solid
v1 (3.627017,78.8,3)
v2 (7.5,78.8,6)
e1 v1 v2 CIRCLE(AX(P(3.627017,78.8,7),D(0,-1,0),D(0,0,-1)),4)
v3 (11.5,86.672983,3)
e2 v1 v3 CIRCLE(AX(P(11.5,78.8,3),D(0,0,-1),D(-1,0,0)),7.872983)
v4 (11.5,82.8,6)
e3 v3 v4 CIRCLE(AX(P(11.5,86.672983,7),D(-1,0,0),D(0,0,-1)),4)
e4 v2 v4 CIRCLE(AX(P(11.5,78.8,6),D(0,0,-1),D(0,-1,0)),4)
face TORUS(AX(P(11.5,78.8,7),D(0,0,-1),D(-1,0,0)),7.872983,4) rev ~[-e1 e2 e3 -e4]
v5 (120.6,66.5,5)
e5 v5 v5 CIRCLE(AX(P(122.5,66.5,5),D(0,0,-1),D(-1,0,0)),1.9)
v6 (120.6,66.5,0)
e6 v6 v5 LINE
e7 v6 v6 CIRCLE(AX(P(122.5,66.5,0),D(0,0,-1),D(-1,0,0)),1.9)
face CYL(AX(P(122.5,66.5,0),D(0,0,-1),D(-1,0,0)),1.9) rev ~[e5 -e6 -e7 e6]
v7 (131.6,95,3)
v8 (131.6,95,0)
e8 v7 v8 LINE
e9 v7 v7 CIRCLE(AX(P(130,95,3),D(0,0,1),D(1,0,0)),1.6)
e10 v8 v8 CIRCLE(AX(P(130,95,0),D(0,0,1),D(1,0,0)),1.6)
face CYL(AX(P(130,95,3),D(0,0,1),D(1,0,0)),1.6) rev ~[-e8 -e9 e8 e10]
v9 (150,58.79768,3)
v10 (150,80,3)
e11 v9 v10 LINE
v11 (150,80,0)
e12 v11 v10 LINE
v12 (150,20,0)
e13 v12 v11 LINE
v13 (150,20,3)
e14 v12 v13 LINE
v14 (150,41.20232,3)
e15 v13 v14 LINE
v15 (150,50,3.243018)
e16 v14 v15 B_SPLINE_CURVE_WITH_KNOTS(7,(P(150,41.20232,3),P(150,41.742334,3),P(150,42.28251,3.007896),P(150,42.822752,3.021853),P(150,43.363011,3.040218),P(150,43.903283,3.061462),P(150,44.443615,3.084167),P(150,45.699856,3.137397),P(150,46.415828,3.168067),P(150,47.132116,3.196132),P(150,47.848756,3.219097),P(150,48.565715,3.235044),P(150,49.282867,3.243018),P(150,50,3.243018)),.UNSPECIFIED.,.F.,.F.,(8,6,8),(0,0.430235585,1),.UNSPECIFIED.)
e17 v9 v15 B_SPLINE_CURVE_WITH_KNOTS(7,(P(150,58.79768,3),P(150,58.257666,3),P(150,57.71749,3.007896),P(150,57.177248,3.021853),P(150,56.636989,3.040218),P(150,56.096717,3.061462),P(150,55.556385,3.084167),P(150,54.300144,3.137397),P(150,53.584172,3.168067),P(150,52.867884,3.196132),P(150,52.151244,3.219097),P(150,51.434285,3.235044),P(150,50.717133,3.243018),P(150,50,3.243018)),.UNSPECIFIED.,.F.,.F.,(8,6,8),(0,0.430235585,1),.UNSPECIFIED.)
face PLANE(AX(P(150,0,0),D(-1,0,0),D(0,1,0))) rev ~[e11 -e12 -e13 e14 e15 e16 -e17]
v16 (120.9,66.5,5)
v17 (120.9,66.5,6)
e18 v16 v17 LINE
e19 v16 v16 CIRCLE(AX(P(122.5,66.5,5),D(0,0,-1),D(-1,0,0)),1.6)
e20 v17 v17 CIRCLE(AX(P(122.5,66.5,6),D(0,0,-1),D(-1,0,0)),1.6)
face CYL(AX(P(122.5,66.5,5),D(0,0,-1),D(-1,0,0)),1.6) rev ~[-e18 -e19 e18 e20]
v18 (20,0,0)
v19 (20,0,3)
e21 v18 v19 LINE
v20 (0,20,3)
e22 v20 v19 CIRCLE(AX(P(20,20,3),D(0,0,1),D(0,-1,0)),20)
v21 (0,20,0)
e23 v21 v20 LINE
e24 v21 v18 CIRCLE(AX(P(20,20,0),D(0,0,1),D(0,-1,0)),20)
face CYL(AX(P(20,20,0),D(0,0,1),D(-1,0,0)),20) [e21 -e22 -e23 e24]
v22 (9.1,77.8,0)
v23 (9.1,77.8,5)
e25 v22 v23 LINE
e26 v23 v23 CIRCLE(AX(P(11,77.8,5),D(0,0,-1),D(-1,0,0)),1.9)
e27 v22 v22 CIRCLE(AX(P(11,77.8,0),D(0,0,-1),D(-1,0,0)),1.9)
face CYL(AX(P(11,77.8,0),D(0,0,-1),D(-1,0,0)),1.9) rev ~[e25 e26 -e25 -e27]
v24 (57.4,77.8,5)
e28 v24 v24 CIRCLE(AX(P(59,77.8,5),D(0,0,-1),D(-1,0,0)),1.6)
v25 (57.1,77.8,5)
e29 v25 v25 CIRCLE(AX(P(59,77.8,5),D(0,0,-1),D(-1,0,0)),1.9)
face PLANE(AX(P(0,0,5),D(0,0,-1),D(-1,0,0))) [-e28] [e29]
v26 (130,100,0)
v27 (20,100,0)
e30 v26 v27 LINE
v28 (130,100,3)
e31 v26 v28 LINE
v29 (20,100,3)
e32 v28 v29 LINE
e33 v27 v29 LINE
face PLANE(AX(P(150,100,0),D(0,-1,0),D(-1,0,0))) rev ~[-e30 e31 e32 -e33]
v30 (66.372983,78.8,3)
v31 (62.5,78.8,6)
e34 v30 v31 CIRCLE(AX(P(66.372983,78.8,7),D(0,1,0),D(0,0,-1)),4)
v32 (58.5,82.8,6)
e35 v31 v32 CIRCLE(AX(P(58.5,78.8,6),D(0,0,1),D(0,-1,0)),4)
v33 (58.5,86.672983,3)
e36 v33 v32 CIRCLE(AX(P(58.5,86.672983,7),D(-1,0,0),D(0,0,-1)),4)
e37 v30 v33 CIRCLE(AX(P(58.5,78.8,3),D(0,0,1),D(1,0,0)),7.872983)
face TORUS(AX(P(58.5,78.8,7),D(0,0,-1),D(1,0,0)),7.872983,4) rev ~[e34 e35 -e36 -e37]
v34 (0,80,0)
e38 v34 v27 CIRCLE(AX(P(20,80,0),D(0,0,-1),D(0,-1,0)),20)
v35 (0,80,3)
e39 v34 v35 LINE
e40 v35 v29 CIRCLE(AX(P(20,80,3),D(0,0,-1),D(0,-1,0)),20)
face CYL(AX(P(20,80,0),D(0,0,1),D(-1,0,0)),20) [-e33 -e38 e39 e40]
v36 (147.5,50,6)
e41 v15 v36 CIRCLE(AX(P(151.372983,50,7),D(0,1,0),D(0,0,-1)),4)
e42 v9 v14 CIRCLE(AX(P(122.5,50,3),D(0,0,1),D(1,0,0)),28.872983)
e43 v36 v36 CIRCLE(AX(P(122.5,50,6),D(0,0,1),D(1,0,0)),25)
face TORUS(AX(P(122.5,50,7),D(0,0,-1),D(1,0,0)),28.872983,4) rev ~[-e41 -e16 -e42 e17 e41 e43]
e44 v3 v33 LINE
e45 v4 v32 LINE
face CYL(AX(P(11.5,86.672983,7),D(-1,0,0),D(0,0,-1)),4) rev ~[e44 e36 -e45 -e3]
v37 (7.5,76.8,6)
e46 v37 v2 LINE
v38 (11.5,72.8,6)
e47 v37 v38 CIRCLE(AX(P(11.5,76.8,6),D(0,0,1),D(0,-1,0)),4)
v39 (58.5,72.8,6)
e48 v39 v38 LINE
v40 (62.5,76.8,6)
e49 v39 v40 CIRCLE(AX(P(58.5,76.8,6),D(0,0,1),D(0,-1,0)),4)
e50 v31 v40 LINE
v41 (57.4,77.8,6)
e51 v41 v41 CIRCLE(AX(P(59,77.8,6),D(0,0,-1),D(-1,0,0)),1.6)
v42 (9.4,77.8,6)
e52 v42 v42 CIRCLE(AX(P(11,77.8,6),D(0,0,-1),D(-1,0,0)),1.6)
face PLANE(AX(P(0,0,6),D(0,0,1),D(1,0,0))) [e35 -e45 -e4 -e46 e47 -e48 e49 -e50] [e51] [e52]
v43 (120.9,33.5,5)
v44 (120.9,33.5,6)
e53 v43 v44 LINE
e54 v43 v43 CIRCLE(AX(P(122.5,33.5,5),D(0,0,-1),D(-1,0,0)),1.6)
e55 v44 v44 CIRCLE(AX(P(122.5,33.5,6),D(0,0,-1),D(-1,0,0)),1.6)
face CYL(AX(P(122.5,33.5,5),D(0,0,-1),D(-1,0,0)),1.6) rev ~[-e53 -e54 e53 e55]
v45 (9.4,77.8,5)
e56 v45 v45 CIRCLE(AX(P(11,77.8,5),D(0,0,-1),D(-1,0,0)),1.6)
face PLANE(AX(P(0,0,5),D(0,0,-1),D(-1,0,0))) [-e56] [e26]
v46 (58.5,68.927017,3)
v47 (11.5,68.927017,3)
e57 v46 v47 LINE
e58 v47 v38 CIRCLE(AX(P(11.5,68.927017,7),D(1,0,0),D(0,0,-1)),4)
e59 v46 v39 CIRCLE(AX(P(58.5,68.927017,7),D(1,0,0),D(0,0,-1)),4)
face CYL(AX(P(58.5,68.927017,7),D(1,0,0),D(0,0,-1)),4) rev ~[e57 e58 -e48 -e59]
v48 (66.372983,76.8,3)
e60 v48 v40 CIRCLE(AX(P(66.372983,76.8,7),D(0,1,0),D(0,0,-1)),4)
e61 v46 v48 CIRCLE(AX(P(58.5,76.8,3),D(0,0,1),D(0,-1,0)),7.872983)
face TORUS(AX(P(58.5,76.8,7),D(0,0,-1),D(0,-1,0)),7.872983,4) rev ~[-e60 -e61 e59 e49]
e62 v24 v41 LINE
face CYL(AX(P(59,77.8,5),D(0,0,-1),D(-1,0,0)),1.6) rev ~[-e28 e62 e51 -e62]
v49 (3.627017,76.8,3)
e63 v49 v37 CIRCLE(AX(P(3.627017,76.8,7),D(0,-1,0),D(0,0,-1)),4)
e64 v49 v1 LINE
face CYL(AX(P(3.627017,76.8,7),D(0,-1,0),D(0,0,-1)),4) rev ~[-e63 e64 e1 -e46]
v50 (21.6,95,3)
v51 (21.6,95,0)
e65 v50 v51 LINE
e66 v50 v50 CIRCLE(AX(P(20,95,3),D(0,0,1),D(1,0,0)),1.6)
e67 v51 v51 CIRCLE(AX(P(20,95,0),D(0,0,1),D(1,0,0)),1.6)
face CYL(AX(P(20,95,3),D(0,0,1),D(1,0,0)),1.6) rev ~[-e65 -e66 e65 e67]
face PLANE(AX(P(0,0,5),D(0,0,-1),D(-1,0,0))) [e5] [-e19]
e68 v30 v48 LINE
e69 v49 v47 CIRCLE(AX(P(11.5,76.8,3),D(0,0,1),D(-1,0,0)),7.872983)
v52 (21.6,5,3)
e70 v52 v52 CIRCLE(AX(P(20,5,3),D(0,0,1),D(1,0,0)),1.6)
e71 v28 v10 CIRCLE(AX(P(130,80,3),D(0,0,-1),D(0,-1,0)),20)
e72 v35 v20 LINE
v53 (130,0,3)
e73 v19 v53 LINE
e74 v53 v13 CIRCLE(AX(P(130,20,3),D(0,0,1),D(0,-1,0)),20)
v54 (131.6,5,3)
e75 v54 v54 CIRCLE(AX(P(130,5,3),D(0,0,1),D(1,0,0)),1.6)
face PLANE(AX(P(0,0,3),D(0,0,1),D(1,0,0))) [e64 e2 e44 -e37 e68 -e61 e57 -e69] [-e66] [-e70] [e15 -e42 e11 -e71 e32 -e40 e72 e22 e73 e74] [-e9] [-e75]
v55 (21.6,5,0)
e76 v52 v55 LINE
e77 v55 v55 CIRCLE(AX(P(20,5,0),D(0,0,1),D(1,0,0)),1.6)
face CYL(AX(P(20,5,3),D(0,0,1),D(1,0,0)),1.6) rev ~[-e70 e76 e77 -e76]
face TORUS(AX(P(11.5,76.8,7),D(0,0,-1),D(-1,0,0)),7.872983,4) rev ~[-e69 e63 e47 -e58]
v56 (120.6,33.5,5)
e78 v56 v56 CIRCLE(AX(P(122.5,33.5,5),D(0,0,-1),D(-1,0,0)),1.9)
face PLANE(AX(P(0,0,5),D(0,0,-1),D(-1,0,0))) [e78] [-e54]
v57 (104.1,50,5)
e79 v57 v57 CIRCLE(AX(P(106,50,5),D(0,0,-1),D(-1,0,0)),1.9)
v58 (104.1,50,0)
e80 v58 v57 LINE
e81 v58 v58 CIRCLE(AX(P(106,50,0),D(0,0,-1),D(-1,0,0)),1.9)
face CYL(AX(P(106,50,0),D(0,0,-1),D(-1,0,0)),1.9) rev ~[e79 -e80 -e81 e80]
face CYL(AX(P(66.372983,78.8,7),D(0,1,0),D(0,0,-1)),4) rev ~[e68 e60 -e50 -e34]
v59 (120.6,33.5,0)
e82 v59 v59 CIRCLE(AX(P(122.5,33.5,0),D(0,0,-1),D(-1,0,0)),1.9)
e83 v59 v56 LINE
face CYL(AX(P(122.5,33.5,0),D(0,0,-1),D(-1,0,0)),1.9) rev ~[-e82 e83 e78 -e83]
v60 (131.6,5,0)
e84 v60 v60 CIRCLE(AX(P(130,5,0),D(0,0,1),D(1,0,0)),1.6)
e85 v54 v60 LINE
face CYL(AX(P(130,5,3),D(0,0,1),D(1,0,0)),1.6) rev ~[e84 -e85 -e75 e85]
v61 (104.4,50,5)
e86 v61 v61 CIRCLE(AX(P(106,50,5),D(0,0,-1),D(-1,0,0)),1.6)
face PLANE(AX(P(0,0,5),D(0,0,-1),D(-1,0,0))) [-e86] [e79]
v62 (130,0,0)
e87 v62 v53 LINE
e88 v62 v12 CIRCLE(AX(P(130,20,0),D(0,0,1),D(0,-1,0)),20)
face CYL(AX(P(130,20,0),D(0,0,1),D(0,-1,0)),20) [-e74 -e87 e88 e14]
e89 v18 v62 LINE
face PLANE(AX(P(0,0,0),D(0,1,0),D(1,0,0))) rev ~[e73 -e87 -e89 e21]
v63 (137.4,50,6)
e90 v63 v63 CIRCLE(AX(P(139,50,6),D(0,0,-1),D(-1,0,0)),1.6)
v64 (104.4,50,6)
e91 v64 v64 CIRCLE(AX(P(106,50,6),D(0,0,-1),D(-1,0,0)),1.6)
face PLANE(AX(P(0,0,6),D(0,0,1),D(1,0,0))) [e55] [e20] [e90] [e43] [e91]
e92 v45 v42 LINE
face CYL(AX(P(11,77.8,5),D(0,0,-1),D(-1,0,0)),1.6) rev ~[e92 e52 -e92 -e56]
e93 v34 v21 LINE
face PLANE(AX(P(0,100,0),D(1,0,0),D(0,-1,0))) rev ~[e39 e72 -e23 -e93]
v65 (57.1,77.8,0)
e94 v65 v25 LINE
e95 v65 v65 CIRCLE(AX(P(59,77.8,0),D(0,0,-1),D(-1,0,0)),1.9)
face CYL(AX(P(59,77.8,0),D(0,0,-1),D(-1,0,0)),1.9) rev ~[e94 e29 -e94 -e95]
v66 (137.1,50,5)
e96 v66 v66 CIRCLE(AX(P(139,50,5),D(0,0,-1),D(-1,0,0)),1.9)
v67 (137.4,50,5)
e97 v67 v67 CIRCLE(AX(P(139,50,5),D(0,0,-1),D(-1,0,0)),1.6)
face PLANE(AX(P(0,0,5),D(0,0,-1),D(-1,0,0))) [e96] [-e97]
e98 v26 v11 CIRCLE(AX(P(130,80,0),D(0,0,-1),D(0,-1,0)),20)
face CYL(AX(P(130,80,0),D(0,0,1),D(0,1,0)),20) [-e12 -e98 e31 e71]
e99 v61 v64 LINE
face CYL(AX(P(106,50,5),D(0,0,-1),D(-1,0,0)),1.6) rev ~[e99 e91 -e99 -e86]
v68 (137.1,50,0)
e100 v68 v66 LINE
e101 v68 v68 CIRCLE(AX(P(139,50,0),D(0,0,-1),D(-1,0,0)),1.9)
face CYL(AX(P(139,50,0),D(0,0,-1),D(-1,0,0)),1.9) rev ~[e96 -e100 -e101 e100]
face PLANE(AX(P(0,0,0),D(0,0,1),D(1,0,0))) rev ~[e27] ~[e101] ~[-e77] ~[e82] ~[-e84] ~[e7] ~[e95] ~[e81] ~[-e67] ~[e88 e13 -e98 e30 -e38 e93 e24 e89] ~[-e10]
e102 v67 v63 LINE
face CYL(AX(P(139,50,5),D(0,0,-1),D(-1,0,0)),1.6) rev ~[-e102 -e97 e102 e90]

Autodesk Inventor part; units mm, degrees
ref_plane "YZ Plane" through (0, 0, 0) normal (1, 0, 0) x (0, 1, 0)
ref_plane "XZ Plane" through (0, 0, 0) normal (0, 1, 0) x (-1, 0, 0)
ref_plane "XY Plane" through (0, 0, 0) normal (0, 0, 1) x (1, 0, 0)
sketch "Boceto1" plane through (0, 0, 0) normal (0, 0, 1) x (1, 0, 0)
  line L0 (0, 0) -> (150, 0)
  line L1 (150, 0) -> (150, 100)
  line L2 (150, 100) -> (0, 100)
  line L3 (0, 100) -> (0, 0)
  dimension "d0" = 150
  dimension "d1" = 100
extrude "Extrusión1" add sketch "Boceto1" along normal blind 3
sketch "Boceto2" plane through (0, 0, 3) normal (0, 0, 1) x (1, 0, 0)
  line L0 (150, 0) -> (150, 100) construction
  line L1 (150, 100) -> (0, 100) construction
  line L2 (0, 100) -> (0, 0) construction
  line L3 (0, 0) -> (150, 0) construction
  line L4 (0, 100) -> (0, 0) construction
  line L5 (0, 50) -> (150, 50) construction
  line L6 (150, 0) -> (150, 100) construction
  line L7 (150, 100) -> (0, 100) construction
  line L8 (122.5, 100) -> (122.5, 0) construction
  line L9 (0, 0) -> (150, 0) construction
  line L10 (0, 66.5) -> (150, 66.5) construction
  line L11 (0, 33.5) -> (150, 33.5) construction
  line L12 (106, 100) -> (106, 0) construction
  line L13 (139, 100) -> (139, 0) construction
  circle A0 centre (106, 50) radius 1.1
  circle A1 centre (122.5, 66.5) radius 1.1
  circle A2 centre (139, 50) radius 1.1
  circle A3 centre (122.5, 33.5) radius 1.1
  line L14 (0, 77.8) -> (150, 77.8) construction
  line L15 (35, 100) -> (35, 0) construction
  line L16 (11, 100) -> (11, 0) construction
  line L17 (59, 100) -> (59, 0) construction
  circle A4 centre (11, 77.8) radius 1.1
  circle A5 centre (59, 77.8) radius 1.1
  line L18 (75, 100) -> (75, 0) construction
  dimension "d4" = 33
  dimension "d5" = 16.5
  dimension "d6" = 33
  dimension "d7" = 16.5
  dimension "d8" = 2.2
  dimension "d9" = 2.2
  dimension "d10" = 2.2
  dimension "d11" = 2.2
  dimension "d15" = 48
  dimension "d16" = 24
  dimension "d17" = 47
  dimension "d18" = 27.8
  dimension "d19" = 2.2
  dimension "d20" = 2.2
  dimension "d22" = 128
  dimension "d24" = 64
extrude "Extrusión2" cut sketch "Boceto2" against normal blind 10
fillet "Empalme1" radius 20 4 edges at (150, 0, 1.5) (150, 100, 1.5) (0, 100, 1.5) (0, 0, 1.5)
sketch "Boceto3" plane through (0, 0, 3) normal (0, 0, 1) x (1, 0, 0)
  circle A0 centre (122.5, 33.5) radius 1.1 construction
  circle A1 centre (106, 50) radius 1.1 construction
  circle A2 centre (11, 77.8) radius 1.1 construction
  circle A3 centre (122.5, 66.5) radius 1.1 construction
  circle A4 centre (139, 50) radius 1.1 construction
  circle A5 centre (59, 77.8) radius 1.1 construction
  arc A6 (0, 20) -> (20, 0) centre (20, 20) ccw construction
  line L0 (20, 0) -> (130, 0) construction
  arc A7 (130, 0) -> (150, 20) centre (130, 20) ccw construction
  line L1 (150, 20) -> (150, 80) construction
  arc A8 (150, 80) -> (130, 100) centre (130, 80) ccw construction
  line L2 (130, 100) -> (20, 100) construction
  arc A9 (20, 100) -> (0, 80) centre (20, 80) ccw construction
  line L3 (0, 80) -> (0, 20) construction
  circle A10 centre (122.5, 66.5) radius 1.1 construction
  line L4 (122.5, 66.5) -> (122.5, 33.5) construction
  circle A11 centre (122.5, 50) radius 25
  line L5 (7.5, 82.8) -> (62.5, 82.8)
  line L6 (62.5, 82.8) -> (62.5, 72.8)
  line L7 (62.5, 72.8) -> (7.5, 72.8)
  line L8 (7.5, 72.8) -> (7.5, 82.8)
  circle A12 centre (11, 77.8) radius 1.1 construction
  circle A13 centre (59, 77.8) radius 1.1 construction
  line L9 (11, 77.8) -> (59, 77.8) construction
  point P0 (0, 0)
  point P1 (35, 77.8)
  dimension "d25" = 50
  dimension "d26" = 10
  dimension "d27" = 55
  dimension "d28" = 27.5
  dimension "d29" = 5
extrude "Extrusión3" add sketch "Boceto3" along normal blind 3
fillet "Empalme2" radius 4 4 edges at (62.5, 82.8, 4.5) (7.5, 82.8, 4.5) (62.5, 72.8, 4.5) (7.5, 72.8, 4.5)
fillet "Empalme3" radius 4 9 edges at (8.6716, 73.9716, 3) (7.5, 77.8, 3) (8.6716, 81.6284, 3) (35, 82.8, 3) (61.3284, 81.6284, 3) (62.5, 77.8, 3) (61.3284, 73.9716, 3) (35, 72.8, 3) (97.5, 50, 3)
sketch "Boceto4" plane through (0, 0, 0) normal (0, 0, -1) x (-1, 0, 0)
  arc A0 (-20, 0) -> (0, 20) centre (-20, 20) ccw construction
  line L0 (0, 80) -> (0, 20) construction
  arc A1 (0, 80) -> (-20, 100) centre (-20, 80) ccw construction
  line L1 (-130, 100) -> (-20, 100) construction
  arc A2 (-130, 100) -> (-150, 80) centre (-130, 80) ccw construction
  line L2 (-150, 20) -> (-150, 80) construction
  arc A3 (-150, 20) -> (-130, 0) centre (-130, 20) ccw construction
  line L3 (-20, 0) -> (-130, 0) construction
  circle A4 centre (-122.5, 33.5) radius 1.1 construction
  circle A5 centre (-106, 50) radius 1.1 construction
  circle A6 centre (-11, 77.8) radius 1.1 construction
  circle A7 centre (-122.5, 66.5) radius 1.1 construction
  circle A8 centre (-139, 50) radius 1.1 construction
  circle A9 centre (-59, 77.8) radius 1.1 construction
  circle A10 centre (-122.5, 33.5) radius 1.1 projected
  circle A11 centre (-122.5, 33.5) radius 1.9
  circle A12 centre (-106, 50) radius 1.1 projected
  circle A13 centre (-106, 50) radius 1.9
  circle A14 centre (-139, 50) radius 1.1 projected
  circle A15 centre (-139, 50) radius 1.9
  circle A16 centre (-122.5, 66.5) radius 1.1 projected
  circle A17 centre (-122.5, 66.5) radius 1.9
  circle A18 centre (-11, 77.8) radius 1.1 projected
  circle A19 centre (-11, 77.8) radius 1.9
  circle A20 centre (-59, 77.8) radius 1.1 projected
  circle A21 centre (-59, 77.8) radius 1.9
  point P0 (0, 0)
  dimension "d34" = 3.8
  dimension "d35" = 3.8
  dimension "d36" = 3.8
  dimension "d37" = 3.8
  dimension "d38" = 3.8
  dimension "d39" = 3.8
extrude "Extrusión4" cut sketch "Boceto4" against normal blind 5 contours A10 | A11 | A12 | A13 | A14 | A15 | A16 | A17 | A18 | A19 | A20 | A21
sketch "Boceto5" plane through (122.5, 33.5, 5) normal (0, 0, -1) x (-1, 0, 0)
  circle A0 centre (111.5, 44.3) radius 1.9 construction
  circle A1 centre (0, 0) radius 1.9 construction
  circle A2 centre (16.5, 16.5) radius 1.9 construction
  circle A3 centre (63.5, 44.3) radius 1.9 construction
  circle A4 centre (0, 33) radius 1.9 construction
  circle A5 centre (-16.5, 16.5) radius 1.9 construction
  arc A6 (102.5, -33.5) -> (122.5, -13.5) centre (102.5, -13.5) ccw construction
  line L0 (122.5, 46.5) -> (122.5, -13.5) construction
  arc A7 (122.5, 46.5) -> (102.5, 66.5) centre (102.5, 46.5) ccw construction
  line L1 (-7.5, 66.5) -> (102.5, 66.5) construction
  arc A8 (-7.5, 66.5) -> (-27.5, 46.5) centre (-7.5, 46.5) ccw construction
  line L2 (-27.5, -13.5) -> (-27.5, 46.5) construction
  arc A9 (-27.5, -13.5) -> (-7.5, -33.5) centre (-7.5, -13.5) ccw construction
  line L3 (102.5, -33.5) -> (-7.5, -33.5) construction
  circle A10 centre (0, 0) radius 1.9 projected
  circle A11 centre (0, 0) radius 1.6
  circle A12 centre (16.5, 16.5) radius 1.9 projected
  circle A13 centre (16.5, 16.5) radius 1.6
  circle A14 centre (-16.5, 16.5) radius 1.9 projected
  circle A15 centre (-16.5, 16.5) radius 1.6
  circle A16 centre (0, 33) radius 1.9 projected
  circle A17 centre (0, 33) radius 1.6
  circle A18 centre (63.5, 44.3) radius 1.9 projected
  circle A19 centre (63.5, 44.3) radius 1.6
  circle A20 centre (111.5, 44.3) radius 1.9 projected
  circle A21 centre (111.5, 44.3) radius 1.6
  point P0 (122.5, -33.5)
  dimension "d42" = 3.2
  dimension "d43" = 3.2
  dimension "d44" = 3.2
  dimension "d45" = 3.2
  dimension "d46" = 3.2
  dimension "d47" = 3.2
extrude "Extrusión5" cut sketch "Boceto5" against normal through all contours A11 | A13 | A15 | A17 | A19 | A21
sketch "Boceto6" plane through (0, 0, 3) normal (0, 0, 1) x (1, 0, 0)
  arc A0 (150, 58.7977) -> (150, 41.2023) centre (122.5, 50) ccw construction
  line L0 (150, 58.7977) -> (150, 80) construction
  arc A1 (150, 80) -> (130, 100) centre (130, 80) ccw construction
  line L1 (130, 100) -> (20, 100) construction
  arc A2 (20, 100) -> (0, 80) centre (20, 80) ccw construction
  line L2 (0, 80) -> (0, 20) construction
  arc A3 (0, 20) -> (20, 0) centre (20, 20) ccw construction
  line L3 (20, 0) -> (130, 0) construction
  arc A4 (130, 0) -> (150, 20) centre (130, 20) ccw construction
  line L4 (150, 20) -> (150, 41.2023) construction
  line L5 (11.5, 68.927) -> (58.5, 68.927) construction
  arc A5 (3.627, 76.8) -> (11.5, 68.927) centre (11.5, 76.8) ccw construction
  line L6 (3.627, 78.8) -> (3.627, 76.8) construction
  arc A6 (11.5, 86.673) -> (3.627, 78.8) centre (11.5, 78.8) ccw construction
  line L7 (58.5, 86.673) -> (11.5, 86.673) construction
  arc A7 (66.373, 78.8) -> (58.5, 86.673) centre (58.5, 78.8) ccw construction
  line L8 (66.373, 76.8) -> (66.373, 78.8) construction
  arc A8 (58.5, 68.927) -> (66.373, 76.8) centre (58.5, 76.8) ccw construction
  line L9 (0, 80) -> (0, 20) construction
  line L10 (0, 95) -> (150, 95) construction
  line L11 (150, 58.7977) -> (150, 80) construction
  line L12 (0, 5) -> (150, 5) construction
  line L13 (150, 20) -> (150, 80) construction
  line L14 (130, 100) -> (20, 100) construction
  line L15 (20, 100) -> (20, 0) construction
  line L16 (20, 0) -> (130, 0) construction
  line L17 (130, 100) -> (130, 0) construction
  circle A9 centre (20, 95) radius 1.6
  circle A10 centre (130, 95) radius 1.6
  circle A11 centre (20, 5) radius 1.6
  circle A12 centre (130, 5) radius 1.6
  point P0 (0, 0)
  dimension "d50" = 20
  dimension "d51" = 5
  dimension "d52" = 20
  dimension "d53" = 5
  dimension "d54" = 3.2
  dimension "d55" = 3.2
  dimension "d56" = 3.2
  dimension "d57" = 3.2
extrude "Extrusión6" cut sketch "Boceto6" against normal through all
equation "\"d5\" = 0.5 * d4"
equation "\"d7\" = d5"
equation "\"d16\" = 0.5 * d15"
equation "\"d24\" = 0.5 * d22"
equation "\"d28\" = 0.5 * d27"
equation "\"d29\" = 0.5 * d26"
properties part number "base_barra_bola"
